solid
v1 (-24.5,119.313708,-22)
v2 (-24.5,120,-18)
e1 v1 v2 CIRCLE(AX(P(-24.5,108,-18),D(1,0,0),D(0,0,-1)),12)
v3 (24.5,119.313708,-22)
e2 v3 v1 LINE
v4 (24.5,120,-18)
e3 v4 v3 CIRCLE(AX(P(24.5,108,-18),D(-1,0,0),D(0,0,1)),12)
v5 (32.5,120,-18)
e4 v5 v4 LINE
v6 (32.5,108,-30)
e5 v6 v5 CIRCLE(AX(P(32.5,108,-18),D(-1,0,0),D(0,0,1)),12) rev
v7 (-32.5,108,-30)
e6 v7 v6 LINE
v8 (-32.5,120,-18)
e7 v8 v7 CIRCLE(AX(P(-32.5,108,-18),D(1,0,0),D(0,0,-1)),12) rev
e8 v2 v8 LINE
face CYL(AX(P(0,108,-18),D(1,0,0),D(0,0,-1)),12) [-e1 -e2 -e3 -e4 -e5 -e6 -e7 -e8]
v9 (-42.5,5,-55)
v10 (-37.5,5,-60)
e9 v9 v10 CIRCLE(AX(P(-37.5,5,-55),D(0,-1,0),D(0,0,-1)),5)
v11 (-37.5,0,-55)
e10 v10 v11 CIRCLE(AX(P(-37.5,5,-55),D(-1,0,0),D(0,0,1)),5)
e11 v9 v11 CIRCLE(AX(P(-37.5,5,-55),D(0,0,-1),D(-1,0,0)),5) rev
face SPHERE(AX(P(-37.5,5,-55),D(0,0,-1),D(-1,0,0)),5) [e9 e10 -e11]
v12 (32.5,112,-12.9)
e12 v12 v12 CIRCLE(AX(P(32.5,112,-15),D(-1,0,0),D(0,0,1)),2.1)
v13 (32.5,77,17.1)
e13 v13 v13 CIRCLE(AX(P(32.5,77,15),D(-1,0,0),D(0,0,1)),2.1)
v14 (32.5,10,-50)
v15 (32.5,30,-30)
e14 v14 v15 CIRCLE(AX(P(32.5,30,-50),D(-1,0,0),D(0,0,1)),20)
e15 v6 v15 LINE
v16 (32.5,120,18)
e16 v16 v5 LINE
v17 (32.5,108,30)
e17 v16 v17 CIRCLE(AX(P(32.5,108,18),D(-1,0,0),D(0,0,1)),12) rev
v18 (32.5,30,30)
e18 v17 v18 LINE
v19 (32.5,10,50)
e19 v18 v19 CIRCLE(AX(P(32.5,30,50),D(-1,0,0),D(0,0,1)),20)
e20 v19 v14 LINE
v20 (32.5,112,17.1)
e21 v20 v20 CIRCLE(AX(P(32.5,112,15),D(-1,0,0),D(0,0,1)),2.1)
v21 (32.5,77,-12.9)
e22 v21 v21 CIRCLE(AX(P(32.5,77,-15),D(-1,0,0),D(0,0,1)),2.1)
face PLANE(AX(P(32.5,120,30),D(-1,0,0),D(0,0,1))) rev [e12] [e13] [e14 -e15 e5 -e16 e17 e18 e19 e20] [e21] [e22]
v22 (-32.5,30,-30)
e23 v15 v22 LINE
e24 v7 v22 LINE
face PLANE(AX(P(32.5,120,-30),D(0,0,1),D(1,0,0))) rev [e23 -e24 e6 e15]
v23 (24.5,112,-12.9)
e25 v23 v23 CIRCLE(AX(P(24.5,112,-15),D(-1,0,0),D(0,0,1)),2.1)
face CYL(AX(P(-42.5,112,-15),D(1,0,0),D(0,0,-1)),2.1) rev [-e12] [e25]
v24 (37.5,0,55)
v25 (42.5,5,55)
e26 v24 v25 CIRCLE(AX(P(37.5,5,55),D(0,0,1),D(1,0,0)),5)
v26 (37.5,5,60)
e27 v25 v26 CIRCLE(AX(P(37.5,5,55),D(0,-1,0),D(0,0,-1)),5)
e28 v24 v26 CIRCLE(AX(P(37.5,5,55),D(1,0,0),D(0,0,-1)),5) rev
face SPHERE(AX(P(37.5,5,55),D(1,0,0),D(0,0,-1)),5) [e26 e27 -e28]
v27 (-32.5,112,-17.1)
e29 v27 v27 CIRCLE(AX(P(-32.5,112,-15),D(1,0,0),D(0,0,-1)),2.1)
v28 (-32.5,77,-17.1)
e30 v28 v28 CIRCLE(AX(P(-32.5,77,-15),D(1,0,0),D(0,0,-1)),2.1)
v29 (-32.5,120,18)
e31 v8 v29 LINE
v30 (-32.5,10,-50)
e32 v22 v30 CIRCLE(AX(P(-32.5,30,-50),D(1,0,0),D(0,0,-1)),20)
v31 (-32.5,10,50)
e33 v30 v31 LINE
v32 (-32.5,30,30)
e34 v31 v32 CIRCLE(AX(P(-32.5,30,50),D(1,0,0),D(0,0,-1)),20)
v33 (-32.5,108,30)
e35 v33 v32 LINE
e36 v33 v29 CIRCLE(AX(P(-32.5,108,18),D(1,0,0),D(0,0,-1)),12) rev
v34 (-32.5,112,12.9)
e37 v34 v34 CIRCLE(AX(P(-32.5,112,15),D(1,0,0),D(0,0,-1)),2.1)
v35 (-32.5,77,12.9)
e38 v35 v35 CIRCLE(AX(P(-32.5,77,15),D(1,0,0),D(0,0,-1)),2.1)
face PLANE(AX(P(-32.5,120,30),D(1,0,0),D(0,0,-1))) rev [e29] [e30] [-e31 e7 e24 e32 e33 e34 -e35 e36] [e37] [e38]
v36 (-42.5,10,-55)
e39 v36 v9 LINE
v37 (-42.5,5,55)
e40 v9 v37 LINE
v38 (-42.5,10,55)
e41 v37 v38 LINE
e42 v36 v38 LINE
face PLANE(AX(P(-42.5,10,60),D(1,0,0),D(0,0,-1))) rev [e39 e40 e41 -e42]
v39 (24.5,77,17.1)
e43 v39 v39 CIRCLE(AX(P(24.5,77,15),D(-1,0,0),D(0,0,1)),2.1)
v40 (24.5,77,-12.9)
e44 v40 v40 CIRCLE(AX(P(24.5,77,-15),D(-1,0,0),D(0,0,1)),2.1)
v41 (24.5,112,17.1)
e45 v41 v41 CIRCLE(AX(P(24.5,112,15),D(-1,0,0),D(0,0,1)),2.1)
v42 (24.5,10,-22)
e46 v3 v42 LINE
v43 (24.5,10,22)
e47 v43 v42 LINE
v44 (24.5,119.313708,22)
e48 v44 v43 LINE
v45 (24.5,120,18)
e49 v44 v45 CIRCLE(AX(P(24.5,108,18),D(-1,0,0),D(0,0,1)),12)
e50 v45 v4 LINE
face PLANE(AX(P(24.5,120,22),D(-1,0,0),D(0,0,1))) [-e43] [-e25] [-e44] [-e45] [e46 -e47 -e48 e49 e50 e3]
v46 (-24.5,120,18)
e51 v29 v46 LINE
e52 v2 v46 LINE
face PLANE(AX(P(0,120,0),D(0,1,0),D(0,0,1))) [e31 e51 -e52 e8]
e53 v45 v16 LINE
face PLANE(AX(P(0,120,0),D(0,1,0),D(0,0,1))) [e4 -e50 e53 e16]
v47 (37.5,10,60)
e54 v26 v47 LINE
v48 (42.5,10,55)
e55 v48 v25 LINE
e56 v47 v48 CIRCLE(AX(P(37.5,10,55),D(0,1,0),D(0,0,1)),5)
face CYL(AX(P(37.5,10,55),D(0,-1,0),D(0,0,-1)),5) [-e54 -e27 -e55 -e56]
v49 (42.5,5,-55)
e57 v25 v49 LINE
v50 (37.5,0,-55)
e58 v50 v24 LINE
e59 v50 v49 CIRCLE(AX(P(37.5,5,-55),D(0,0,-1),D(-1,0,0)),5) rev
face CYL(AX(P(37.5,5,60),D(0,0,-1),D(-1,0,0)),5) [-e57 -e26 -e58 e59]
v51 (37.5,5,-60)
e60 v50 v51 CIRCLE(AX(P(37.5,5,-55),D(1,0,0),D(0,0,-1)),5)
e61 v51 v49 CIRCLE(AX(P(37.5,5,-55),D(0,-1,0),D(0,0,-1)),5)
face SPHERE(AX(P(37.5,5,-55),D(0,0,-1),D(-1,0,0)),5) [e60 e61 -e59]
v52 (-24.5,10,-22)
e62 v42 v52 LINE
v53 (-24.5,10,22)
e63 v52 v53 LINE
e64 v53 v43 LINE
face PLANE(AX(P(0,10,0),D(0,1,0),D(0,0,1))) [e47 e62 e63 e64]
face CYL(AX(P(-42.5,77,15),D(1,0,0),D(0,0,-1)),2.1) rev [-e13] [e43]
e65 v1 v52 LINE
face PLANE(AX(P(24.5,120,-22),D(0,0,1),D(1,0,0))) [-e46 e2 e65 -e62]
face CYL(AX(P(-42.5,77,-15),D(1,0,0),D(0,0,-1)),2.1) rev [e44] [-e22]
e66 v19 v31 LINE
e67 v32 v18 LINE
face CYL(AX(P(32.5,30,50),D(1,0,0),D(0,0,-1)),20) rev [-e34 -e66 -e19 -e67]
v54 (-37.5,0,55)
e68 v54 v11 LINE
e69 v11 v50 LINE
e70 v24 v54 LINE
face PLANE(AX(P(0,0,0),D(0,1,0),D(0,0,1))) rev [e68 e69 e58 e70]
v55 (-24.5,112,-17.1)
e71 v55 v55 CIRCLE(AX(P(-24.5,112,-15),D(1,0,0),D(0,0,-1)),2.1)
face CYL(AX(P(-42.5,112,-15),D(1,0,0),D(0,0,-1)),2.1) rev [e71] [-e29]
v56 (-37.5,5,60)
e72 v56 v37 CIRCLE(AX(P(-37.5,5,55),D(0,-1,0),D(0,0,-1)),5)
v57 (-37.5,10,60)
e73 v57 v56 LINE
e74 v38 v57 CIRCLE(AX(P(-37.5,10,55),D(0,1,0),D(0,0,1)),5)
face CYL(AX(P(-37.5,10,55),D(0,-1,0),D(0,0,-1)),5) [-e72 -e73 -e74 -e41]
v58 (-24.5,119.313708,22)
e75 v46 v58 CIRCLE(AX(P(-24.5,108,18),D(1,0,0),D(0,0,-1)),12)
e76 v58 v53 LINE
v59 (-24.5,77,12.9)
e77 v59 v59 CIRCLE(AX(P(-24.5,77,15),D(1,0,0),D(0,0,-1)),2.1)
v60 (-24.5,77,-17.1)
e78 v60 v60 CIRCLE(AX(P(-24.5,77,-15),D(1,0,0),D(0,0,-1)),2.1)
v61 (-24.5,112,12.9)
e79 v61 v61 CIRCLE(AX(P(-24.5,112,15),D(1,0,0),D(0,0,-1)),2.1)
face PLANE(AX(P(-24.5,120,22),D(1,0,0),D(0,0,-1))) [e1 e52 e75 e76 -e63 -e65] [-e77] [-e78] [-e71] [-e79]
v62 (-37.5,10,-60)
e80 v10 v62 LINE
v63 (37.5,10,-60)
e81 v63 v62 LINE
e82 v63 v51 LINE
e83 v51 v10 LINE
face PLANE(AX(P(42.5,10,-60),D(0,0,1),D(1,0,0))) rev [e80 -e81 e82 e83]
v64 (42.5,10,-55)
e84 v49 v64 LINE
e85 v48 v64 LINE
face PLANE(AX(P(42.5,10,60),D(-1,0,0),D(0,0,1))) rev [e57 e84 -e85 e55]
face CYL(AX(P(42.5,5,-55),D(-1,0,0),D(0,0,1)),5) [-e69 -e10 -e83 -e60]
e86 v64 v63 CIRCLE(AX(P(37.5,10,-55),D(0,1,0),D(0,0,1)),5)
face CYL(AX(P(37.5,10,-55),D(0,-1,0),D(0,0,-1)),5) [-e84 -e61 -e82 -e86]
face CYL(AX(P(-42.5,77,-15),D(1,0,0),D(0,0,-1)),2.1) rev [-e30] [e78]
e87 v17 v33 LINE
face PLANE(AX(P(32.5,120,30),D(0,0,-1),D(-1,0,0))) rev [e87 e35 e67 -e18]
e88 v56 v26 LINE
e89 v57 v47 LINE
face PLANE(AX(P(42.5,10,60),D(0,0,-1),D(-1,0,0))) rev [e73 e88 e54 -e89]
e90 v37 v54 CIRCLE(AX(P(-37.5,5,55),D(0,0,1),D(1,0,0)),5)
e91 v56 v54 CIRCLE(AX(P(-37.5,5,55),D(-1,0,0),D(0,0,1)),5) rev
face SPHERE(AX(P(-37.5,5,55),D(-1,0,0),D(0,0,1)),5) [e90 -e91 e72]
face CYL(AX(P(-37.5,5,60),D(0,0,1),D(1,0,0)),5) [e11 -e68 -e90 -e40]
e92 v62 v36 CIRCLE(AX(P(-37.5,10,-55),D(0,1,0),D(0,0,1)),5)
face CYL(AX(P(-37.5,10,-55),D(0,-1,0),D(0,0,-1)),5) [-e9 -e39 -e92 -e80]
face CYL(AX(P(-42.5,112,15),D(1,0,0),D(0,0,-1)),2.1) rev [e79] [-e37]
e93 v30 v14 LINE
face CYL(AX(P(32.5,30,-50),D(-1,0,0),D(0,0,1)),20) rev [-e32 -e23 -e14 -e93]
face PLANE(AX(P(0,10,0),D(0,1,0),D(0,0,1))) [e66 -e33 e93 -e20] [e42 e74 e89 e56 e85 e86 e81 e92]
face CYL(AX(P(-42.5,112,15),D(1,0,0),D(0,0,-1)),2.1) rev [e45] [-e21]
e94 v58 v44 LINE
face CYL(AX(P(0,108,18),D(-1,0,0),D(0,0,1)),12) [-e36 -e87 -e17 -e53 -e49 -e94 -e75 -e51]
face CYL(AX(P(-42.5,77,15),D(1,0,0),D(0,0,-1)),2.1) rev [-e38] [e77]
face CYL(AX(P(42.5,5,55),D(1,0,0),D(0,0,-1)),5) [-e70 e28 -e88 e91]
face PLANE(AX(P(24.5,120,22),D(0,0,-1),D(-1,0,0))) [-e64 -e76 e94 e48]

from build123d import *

# Parameters (mm, degrees)
SKETCH_1_W          = 85
SKETCH_1_H          = 120
EXTRUDE_1_DEPTH     = 10
SKETCH_2_W          = 65
SKETCH_2_H          = 60
SKETCH_2_W_2        = 49
SKETCH_2_H_2        = 44
EXTRUDE_2_DEPTH     = 110
FILLET_1_R          = 5
FILLET_2_R          = 12
SKETCH_3_R          = 2.1
CUT_EXTRUDE_1_DEPTH = 159.823801743
FILLET_3_R          = 20


with BuildPart() as part:
    # 草图1 → 凸台-拉伸1 (new body)
    with BuildSketch(Plane(origin=(0, 0, 0), x_dir=(1, 0, 0), z_dir=(0, 1, 0))):
        Rectangle(SKETCH_1_W, SKETCH_1_H)
    extrude(amount=EXTRUDE_1_DEPTH)

    # 草图2 → 凸台-拉伸2 (add)
    with BuildSketch(Plane(origin=(0, 10, 0), x_dir=(1, 0, 0), z_dir=(0, 1, 0))):
        Rectangle(SKETCH_2_W, SKETCH_2_H)
        Rectangle(SKETCH_2_W_2, SKETCH_2_H_2, mode=Mode.SUBTRACT)
    extrude(amount=EXTRUDE_2_DEPTH)

    # 圆角1
    fillet_1_edges = [part.edges().sort_by_distance(p)[0] for p in [
        (0, 0, -60),
        (42.5, 0, 0),
        (0, 0, 60),
        (-42.5, 0, 0),
        (-42.5, 5, -60),
        (42.5, 5, -60),
        (42.5, 5, 60),
        (-42.5, 5, 60),
    ]]
    fillet(fillet_1_edges, radius=FILLET_1_R)

    # 圆角2
    # the kernel refuses this fillet: 12 mm, written as the material it takes off along each edge
    with BuildSketch(Plane(origin=(62.5, 120, 30), x_dir=(0, -1, 0), z_dir=(-1, 0, 0)), Plane(origin=(-62.5, 120, -30), x_dir=(0, -1, 0), z_dir=(1, 0, 0))) as fillet_2_piece_1:
        with BuildLine():
            CenterArc((FILLET_2_R, -FILLET_2_R), FILLET_2_R, 90, 90)
            Line((0, -FILLET_2_R), (0, 0))
            Line((0, 0), (FILLET_2_R, 0))
        make_face()
    extrude(amount=125, mode=Mode.SUBTRACT)

    # 草图3 → 切除-拉伸1 (cut, through all)
    with BuildSketch(Plane(origin=(42.5, 0, 0), x_dir=(0, 0, -1), z_dir=(1, 0, 0))):
        with Locations(Location((-15, 112, 0), (0, 0, 180))):
            Circle(SKETCH_3_R)
        with Locations(Location((15, 112, 0), (0, 0, 180))):
            Circle(SKETCH_3_R)
        with Locations(Location((15, 77, 0), (0, 0, 180))):
            Circle(SKETCH_3_R)
        with Locations(Location((-15, 77, 0), (0, 0, 180))):
            Circle(SKETCH_3_R)
    extrude(amount=-CUT_EXTRUDE_1_DEPTH, mode=Mode.SUBTRACT)

    # 圆角3
    fillet_3_edges = [part.edges().sort_by_distance(p)[0] for p in [
        (0, 10, 30),
        (0, 10, -30),
    ]]
    fillet(fillet_3_edges, radius=FILLET_3_R)


solid = part.part
